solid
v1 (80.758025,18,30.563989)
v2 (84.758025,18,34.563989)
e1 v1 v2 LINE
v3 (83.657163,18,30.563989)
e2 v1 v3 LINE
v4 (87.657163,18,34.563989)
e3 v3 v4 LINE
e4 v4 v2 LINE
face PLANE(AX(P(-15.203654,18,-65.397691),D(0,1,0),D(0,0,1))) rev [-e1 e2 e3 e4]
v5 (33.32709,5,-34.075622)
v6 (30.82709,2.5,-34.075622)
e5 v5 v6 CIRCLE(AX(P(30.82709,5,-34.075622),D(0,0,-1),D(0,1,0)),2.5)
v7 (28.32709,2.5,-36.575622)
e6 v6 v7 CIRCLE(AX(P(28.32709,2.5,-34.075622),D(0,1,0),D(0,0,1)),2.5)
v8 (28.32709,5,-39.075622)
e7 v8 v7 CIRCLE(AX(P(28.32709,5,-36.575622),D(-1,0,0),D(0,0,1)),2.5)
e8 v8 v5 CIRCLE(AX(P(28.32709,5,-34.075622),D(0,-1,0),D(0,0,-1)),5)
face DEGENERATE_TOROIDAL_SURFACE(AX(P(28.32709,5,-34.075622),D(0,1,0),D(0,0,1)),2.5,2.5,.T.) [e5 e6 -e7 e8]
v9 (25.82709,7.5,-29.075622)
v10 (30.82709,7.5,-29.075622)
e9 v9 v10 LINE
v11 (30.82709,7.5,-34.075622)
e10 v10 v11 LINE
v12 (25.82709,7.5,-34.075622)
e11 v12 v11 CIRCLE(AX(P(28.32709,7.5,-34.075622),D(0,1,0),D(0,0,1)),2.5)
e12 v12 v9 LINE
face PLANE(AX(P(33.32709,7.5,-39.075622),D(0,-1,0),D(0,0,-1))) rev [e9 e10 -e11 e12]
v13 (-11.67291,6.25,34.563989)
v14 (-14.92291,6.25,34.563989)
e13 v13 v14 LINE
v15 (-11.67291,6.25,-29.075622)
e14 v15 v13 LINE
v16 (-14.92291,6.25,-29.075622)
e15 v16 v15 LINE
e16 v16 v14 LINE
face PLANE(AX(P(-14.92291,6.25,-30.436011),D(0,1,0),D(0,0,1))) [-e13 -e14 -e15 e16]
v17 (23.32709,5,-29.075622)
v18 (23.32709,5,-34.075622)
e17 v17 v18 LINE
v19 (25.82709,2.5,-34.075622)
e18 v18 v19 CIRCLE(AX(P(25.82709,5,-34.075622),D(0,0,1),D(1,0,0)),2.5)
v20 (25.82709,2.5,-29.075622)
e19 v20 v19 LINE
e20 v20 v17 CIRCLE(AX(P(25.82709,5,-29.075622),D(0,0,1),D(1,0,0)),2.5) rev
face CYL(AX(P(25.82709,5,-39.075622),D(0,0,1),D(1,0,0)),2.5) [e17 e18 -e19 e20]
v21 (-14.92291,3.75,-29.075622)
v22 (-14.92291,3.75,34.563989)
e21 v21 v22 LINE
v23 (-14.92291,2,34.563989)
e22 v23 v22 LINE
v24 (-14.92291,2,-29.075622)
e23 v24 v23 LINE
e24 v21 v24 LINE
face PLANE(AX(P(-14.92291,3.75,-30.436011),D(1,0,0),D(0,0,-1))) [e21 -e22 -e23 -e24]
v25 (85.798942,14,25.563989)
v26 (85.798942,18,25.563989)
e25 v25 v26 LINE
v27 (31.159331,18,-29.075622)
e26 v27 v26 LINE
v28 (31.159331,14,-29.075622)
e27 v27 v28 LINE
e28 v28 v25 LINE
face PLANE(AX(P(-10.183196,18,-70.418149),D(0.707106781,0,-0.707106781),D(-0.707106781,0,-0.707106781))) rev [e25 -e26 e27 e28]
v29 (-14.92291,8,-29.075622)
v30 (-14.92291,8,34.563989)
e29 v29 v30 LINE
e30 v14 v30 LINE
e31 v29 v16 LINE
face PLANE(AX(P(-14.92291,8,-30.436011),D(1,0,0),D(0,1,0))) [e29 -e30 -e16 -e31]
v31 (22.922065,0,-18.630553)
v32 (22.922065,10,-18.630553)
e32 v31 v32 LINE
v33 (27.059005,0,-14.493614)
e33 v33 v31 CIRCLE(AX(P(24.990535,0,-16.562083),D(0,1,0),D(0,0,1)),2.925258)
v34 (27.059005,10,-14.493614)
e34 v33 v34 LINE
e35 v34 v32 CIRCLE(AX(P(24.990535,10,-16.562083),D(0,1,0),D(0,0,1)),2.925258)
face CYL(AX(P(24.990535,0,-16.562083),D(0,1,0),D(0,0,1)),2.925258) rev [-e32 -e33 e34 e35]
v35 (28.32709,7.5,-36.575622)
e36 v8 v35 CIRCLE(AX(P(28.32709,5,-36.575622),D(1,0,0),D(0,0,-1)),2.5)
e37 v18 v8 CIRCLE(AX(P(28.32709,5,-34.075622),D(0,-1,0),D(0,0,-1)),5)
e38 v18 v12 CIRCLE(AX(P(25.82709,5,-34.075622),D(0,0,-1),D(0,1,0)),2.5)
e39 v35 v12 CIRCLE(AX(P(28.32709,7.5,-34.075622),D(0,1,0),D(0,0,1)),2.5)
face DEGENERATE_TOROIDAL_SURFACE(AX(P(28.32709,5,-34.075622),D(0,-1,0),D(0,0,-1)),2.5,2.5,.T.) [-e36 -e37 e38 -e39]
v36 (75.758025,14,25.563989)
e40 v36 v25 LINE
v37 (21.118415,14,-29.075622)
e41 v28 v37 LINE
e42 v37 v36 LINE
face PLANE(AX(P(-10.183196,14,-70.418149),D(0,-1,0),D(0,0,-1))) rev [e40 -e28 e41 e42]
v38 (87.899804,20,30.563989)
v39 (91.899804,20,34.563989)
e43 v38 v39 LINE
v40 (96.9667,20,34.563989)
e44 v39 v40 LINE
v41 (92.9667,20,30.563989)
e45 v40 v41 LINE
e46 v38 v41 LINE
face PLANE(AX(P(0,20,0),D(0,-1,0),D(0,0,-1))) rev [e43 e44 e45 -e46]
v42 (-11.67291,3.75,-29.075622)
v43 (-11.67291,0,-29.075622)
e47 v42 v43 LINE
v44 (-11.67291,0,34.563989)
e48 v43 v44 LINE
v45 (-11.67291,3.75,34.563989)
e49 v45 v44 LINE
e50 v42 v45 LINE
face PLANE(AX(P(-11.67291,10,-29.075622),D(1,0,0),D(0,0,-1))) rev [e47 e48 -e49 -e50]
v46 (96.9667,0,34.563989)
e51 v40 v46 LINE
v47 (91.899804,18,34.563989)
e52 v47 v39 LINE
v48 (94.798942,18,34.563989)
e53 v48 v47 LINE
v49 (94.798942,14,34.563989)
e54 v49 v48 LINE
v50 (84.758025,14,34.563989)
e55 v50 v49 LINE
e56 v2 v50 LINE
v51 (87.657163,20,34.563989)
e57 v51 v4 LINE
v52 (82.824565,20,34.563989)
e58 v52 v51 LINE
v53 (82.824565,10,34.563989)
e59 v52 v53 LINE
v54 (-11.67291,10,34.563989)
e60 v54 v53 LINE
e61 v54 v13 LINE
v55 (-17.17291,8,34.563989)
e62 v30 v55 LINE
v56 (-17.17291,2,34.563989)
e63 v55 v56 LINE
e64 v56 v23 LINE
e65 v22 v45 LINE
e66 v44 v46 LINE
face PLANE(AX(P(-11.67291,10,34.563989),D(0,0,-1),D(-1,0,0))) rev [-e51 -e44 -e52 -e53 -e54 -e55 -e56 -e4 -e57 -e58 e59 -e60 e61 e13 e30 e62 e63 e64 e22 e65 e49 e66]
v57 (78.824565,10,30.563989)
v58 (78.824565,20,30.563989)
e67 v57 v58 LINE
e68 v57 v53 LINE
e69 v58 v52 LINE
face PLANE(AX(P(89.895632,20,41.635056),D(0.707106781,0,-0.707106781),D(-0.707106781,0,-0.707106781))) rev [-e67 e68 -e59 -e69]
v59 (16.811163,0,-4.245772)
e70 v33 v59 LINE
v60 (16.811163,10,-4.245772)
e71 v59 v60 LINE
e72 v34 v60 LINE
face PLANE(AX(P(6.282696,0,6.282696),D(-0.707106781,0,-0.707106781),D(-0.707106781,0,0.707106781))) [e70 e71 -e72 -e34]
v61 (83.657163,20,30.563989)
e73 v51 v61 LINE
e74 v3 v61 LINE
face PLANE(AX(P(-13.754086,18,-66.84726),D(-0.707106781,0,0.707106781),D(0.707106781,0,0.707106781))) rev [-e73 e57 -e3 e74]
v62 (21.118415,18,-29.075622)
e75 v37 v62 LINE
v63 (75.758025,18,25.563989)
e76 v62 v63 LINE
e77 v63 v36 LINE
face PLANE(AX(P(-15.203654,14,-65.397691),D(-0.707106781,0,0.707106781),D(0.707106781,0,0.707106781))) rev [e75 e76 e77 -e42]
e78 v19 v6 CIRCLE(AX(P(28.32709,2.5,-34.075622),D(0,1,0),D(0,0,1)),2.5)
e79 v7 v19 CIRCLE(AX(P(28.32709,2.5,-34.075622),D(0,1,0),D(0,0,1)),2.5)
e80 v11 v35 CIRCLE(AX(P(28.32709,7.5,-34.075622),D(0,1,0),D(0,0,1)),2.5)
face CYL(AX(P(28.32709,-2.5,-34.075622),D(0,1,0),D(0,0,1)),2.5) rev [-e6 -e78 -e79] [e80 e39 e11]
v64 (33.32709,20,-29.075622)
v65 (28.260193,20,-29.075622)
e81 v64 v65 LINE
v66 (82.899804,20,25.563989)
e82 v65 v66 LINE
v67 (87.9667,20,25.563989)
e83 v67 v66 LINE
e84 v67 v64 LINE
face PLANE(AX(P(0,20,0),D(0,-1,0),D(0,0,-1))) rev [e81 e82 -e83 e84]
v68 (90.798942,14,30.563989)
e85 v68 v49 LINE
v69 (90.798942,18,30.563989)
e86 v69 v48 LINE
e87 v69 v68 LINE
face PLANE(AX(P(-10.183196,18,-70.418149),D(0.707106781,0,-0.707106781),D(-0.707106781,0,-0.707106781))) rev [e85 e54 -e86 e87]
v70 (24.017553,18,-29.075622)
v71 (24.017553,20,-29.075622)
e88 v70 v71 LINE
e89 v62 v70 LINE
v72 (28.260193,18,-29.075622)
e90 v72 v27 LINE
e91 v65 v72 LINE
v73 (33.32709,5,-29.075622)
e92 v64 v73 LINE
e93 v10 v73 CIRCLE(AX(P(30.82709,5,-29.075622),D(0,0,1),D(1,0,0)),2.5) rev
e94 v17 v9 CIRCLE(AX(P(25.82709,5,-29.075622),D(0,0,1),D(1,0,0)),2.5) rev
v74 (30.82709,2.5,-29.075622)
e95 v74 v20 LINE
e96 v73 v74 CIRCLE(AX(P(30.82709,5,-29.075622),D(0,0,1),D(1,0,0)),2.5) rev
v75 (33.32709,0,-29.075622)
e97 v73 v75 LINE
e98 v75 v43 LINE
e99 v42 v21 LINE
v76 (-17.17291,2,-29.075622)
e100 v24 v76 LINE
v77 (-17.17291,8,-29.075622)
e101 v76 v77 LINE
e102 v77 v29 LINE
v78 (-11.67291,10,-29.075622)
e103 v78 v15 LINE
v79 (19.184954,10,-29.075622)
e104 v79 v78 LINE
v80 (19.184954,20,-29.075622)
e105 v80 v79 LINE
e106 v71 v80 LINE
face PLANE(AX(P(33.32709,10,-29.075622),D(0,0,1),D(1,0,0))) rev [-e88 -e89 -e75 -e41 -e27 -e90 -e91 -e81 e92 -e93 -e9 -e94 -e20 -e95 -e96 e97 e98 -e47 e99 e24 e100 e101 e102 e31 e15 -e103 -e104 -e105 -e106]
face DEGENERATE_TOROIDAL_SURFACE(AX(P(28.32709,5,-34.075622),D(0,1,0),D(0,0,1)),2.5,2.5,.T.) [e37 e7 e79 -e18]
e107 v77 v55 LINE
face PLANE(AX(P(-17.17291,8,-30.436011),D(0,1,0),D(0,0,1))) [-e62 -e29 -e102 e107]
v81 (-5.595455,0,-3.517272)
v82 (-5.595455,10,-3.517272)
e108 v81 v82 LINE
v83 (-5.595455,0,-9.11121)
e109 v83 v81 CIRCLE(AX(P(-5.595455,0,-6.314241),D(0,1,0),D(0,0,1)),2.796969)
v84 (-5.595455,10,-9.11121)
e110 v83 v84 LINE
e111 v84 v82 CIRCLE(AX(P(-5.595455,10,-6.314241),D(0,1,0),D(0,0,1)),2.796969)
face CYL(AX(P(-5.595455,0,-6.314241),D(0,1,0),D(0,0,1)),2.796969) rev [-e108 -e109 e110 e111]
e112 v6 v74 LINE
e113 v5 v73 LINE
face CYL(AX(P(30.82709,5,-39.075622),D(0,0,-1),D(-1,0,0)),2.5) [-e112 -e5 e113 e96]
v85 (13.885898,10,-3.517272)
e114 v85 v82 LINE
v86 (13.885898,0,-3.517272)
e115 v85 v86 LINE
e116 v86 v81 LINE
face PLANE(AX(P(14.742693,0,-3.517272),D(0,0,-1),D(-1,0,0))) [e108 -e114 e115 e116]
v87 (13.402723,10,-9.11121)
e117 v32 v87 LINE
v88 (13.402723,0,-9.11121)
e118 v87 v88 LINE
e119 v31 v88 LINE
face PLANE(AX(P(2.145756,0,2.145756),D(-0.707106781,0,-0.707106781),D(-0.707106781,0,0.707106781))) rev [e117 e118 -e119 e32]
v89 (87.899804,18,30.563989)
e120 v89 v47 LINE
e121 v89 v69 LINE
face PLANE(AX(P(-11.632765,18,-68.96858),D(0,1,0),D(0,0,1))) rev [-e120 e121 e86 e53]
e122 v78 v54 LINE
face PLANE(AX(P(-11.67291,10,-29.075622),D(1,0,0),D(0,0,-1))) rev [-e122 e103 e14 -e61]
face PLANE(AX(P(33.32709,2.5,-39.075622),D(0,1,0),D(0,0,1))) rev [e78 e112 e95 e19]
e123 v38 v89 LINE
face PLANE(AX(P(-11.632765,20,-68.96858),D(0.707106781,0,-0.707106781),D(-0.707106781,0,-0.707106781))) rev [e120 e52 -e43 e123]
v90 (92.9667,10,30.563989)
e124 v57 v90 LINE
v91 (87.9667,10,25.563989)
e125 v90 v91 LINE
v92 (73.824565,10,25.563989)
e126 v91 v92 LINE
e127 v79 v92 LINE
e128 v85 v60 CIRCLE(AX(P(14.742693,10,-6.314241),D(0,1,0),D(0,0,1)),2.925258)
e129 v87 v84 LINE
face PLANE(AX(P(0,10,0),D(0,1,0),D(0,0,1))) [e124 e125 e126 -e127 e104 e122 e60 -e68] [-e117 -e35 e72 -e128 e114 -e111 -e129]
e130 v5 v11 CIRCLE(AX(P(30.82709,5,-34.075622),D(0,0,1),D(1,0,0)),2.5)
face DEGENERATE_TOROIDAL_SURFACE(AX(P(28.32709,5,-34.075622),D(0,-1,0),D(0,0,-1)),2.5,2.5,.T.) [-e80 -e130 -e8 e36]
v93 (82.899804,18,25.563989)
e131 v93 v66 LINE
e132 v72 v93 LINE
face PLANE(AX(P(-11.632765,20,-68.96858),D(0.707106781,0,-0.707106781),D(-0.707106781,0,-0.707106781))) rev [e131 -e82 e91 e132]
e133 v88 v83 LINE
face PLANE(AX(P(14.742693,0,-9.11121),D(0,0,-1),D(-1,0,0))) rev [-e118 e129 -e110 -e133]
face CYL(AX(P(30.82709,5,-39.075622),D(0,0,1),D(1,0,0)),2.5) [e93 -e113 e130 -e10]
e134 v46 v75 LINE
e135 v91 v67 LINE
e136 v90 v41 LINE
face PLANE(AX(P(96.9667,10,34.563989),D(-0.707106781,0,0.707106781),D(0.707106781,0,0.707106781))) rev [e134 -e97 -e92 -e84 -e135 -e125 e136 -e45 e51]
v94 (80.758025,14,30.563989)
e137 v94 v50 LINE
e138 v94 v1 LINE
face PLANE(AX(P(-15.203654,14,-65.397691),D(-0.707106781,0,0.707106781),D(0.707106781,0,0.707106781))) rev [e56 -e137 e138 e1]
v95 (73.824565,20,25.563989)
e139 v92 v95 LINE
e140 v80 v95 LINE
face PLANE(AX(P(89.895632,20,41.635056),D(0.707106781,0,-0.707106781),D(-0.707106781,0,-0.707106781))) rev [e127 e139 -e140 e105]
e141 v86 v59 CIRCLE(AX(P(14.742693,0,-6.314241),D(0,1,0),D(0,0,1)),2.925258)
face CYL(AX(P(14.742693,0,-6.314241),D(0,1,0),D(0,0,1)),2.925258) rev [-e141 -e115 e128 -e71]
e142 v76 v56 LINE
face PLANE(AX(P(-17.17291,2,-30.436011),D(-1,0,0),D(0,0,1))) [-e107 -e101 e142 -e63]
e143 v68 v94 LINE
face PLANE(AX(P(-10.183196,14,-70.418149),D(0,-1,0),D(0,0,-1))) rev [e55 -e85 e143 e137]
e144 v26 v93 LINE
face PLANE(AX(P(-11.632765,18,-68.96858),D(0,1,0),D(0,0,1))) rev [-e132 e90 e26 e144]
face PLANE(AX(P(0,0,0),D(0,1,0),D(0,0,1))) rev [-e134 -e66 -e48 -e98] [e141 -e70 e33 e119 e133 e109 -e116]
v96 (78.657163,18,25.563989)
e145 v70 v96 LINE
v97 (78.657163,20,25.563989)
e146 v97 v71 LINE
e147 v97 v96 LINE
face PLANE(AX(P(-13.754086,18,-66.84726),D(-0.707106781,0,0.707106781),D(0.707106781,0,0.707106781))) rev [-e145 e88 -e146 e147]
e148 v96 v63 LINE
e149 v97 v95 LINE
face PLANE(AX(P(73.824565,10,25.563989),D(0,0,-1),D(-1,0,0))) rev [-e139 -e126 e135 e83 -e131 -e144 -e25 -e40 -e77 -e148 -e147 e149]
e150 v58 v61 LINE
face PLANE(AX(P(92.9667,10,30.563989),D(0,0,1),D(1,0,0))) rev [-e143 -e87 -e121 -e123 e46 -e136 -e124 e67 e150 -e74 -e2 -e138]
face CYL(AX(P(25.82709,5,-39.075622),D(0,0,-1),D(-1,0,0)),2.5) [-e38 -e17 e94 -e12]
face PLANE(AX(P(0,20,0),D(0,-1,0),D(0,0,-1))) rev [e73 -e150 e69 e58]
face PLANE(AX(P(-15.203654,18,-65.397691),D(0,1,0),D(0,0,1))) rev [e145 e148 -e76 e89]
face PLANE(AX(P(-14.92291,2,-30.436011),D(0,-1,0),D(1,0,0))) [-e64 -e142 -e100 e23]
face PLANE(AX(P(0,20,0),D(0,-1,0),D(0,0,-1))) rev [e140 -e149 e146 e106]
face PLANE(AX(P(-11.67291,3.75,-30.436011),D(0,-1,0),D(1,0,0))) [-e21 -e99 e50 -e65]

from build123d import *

# Parameters (mm, degrees)
BOSS_EXTRUDE1_DEPTH = 10
BOSS_EXTRUDE3_DEPTH = 65
SKETCH3_W           = 6.566984135
SKETCH3_H           = 1.360389693
CUT_EXTRUDE2_DEPTH  = 65
BOSS_EXTRUDE4_DEPTH = 3.25
BOSS_EXTRUDE5_DEPTH = 2.25
SKETCH7_W           = 10
SKETCH7_H           = 5
BOSS_EXTRUDE6_DEPTH = 10
SKETCH8_R           = 2.5
CUT_EXTRUDE3_DEPTH  = 10
FILLET1_R           = 5
FILLET2_R           = 5
FILLET4_R           = 2.5
FILLET5_R           = 2.5
SKETCH9_W           = 100
SKETCH9_H           = 5.5
CUT_EXTRUDE4_DEPTH  = 100
BOSS_EXTRUDE7_DEPTH = 10
CUT_EXTRUDE5_DEPTH  = 150
SKETCH12_W          = 29.92089387
SKETCH12_H          = 33.203721342
CUT_EXTRUDE6_DEPTH  = 150
SKETCH14_W          = 19.184954217
SKETCH14_H          = 28.132637814
CUT_EXTRUDE7_DEPTH  = 150
SKETCH16_W          = 15.620456736
SKETCH16_H          = 10.822807293
CUT_EXTRUDE8_DEPTH  = 150
CUT_EXTRUDE9_DEPTH  = 10
CUT_EXTRUDE10_DEPTH = 10


with BuildPart() as part:
    # Sketch1 → Boss-Extrude1 (new body)
    with BuildSketch(Plane(origin=(0, 0, 0), x_dir=(1, 0, 0), z_dir=(0, 1, 0))):
        Polygon((-11.672910159, -34.563988547), (96.966700148, -34.563988547), (33.327089841, 29.07562176), (-11.672910159, 29.07562176), align=None)
    extrude(amount=BOSS_EXTRUDE1_DEPTH)

    # Sketch2 → Boss-Extrude3 (add)
    with BuildSketch(Plane.XY.offset(34.563988547)):
        Polygon((-11.672910159, 3.75), (-14.922910159, 3.75), (-14.922910159, 2), (-17.172910159, 2), (-17.172910159, 8), (-14.922910159, 8), (-14.922910159, 6.25), (-11.672910159, 6.25), align=None)
    extrude(amount=-BOSS_EXTRUDE3_DEPTH)

    # Sketch3 → Cut-Extrude2 (cut)
    with BuildSketch(Plane(origin=(0, 8, 0), x_dir=(1, 0, 0), z_dir=(0, 1, 0))):
        with Locations((-13.889418092, 29.755816607)):
            Rectangle(SKETCH3_W, SKETCH3_H)
    extrude(amount=-CUT_EXTRUDE2_DEPTH, mode=Mode.SUBTRACT)

    # Sketch4 → Boss-Extrude4 (add)
    with BuildSketch(Plane(origin=(0, 10, 0), x_dir=(1, 0, 0), z_dir=(0, 1, 0))):
        Polygon((91.663399289, -34.563988547), (28.023788982, 29.07562176), (25.520630977, 29.07562176), (89.160241283, -34.563988547), align=None)
    extrude(amount=BOSS_EXTRUDE4_DEPTH)

    # Sketch6 → Boss-Extrude5 (add)
    with BuildSketch(Plane(origin=(0, 13.25, 0), x_dir=(1, 0, 0), z_dir=(0, 1, 0))):
        Polygon((90.411820286, -34.563988547), (94.136820286, -34.563988547), (30.497209979, 29.07562176), (23.047209979, 29.07562176), (86.686820286, -34.563988547), align=None)
    extrude(amount=BOSS_EXTRUDE5_DEPTH)

    # Sketch7 → Boss-Extrude6 (add)
    with BuildSketch(Plane(origin=(0, 0, -29.07562176), x_dir=(-1, 0, 0), z_dir=(0, 0, -1))):
        with Locations((-28.327089841, 5)):
            Rectangle(SKETCH7_W, SKETCH7_H)
    extrude(amount=BOSS_EXTRUDE6_DEPTH)

    # Sketch8 → Cut-Extrude3 (cut)
    with BuildSketch(Plane(origin=(0, 7.5, 0), x_dir=(1, 0, 0), z_dir=(0, 1, 0))):
        with Locations(Location((28.327089841, 34.07562176, 0), (0, 0, 270))):
            Circle(SKETCH8_R)
    extrude(amount=-CUT_EXTRUDE3_DEPTH, mode=Mode.SUBTRACT)

    # Fillet1
    fillet1_edges = [part.edges().sort_by_distance(p)[0] for p in [
        (23.327089841, 5, -39.07562176),
    ]]
    fillet(fillet1_edges, radius=FILLET1_R)

    # Fillet2
    fillet2_edges = [part.edges().sort_by_distance(p)[0] for p in [
        (33.327089841, 5, -39.07562176),
    ]]
    fillet(fillet2_edges, radius=FILLET2_R - 0.0001)  # a hair under: the kernel refuses the full size

    # Fillet4
    fillet4_edges = [part.edges().sort_by_distance(p)[0] for p in [
        (23.327089841, 7.5, -31.57562176),
        (33.327089841, 7.5, -31.57567176),
        (24.791555935, 7.5, -37.611155666),
    ]]
    fillet(fillet4_edges, radius=FILLET4_R - 0.0001)  # a hair under: the kernel refuses the full size

    # Fillet5
    fillet5_edges = [part.edges().sort_by_distance(p)[0] for p in [
        (23.327089841, 2.5, -31.57562176),
        (33.327089841, 2.5, -31.57567176),
        (24.791555935, 2.5, -37.611155666),
        (31.862653036, 2.5, -37.611184955),
    ]]
    fillet(fillet5_edges, radius=FILLET5_R - 0.0001)  # a hair under: the kernel refuses the full size

    # Sketch9 → Cut-Extrude4 (cut)
    with BuildSketch(Plane.XY.offset(34.563988547)):
        with Locations((44.136820286, 12.75)):
            Rectangle(SKETCH9_W, SKETCH9_H)
    extrude(amount=-CUT_EXTRUDE4_DEPTH, mode=Mode.SUBTRACT)

    # Sketch10 → Boss-Extrude7 (add)
    with BuildSketch(Plane(origin=(0, 10, 0), x_dir=(1, 0, 0), z_dir=(0, 1, 0))):
        Polygon((96.966700148, -34.563988547), (89.895632336, -41.635056358), (7.416994707, 40.84358127), (14.488062519, 47.914649082), align=None)
    extrude(amount=BOSS_EXTRUDE7_DEPTH)

    # Sketch11 → Cut-Extrude5 (cut)
    with BuildSketch(Plane(origin=(65.765344347, 0, 65.765344347), x_dir=(0.7071067811865475, 0, -0.7071067811865477), z_dir=(0.7071067811865477, 0, 0.7071067811865475))):
        Polygon((40.542543722, 20), (40.542543722, 18), (42.592543722, 18), (42.592543722, 14), (35.492543722, 14), (35.492543722, 18), (37.542543722, 18), (37.542543722, 20), align=None)
    extrude(amount=-CUT_EXTRUDE5_DEPTH, mode=Mode.SUBTRACT)

    # Sketch12 → Cut-Extrude6 (cut)
    with BuildSketch(Plane(origin=(0, 10, 0), x_dir=(-1, 0, 0), z_dir=(0, -1, 0))):
        with Locations((-34.145401152, 45.677482431)):
            Rectangle(SKETCH12_W, SKETCH12_H)
    extrude(amount=-CUT_EXTRUDE6_DEPTH, mode=Mode.SUBTRACT)


with BuildPart() as cut_extrude6_piece_1:
    # of the separate pieces the step leaves, piece 1, a body of its own (cut_extrude6_pieces)
    add(part.part.solids().sort_by_distance((30.827189841, 2.5, -29.07562176))[0])

    # Sketch16 → Cut-Extrude8 (cut)
    with BuildSketch(Plane(origin=(0, 10, 0), x_dir=(-1, 0, 0), z_dir=(0, -1, 0))):
        with Locations((-90.634792892, -39.975392193)):
            Rectangle(SKETCH16_W, SKETCH16_H)
    extrude(amount=-CUT_EXTRUDE8_DEPTH, mode=Mode.SUBTRACT)

    # Sketch17 → Cut-Extrude9 (cut)
    with BuildSketch(Plane(origin=(0, 20, 0), x_dir=(1, 0, 0), z_dir=(0, 1, 0))):
        Polygon((92.966700148, -30.563988547), (78.824564524, -30.563988547), (73.824564524, -25.563988547), (87.966700148, -25.563988547), align=None)
    extrude(amount=-CUT_EXTRUDE9_DEPTH, mode=Mode.SUBTRACT)

    # Sketch18 → Cut-Extrude10 (cut)
    with BuildSketch(Plane(origin=(0, 10, 0), x_dir=(1, 0, 0), z_dir=(0, 1, 0))):
        with BuildLine():
            Line((27.059004739, 14.493613639), (16.811162643, 4.245771544))
            ThreePointArc((16.811162643, 4.245771544), (12.674223335, 4.245771544), (12.674223335, 8.382710852))
            Line((12.674223335, 8.382710852), (22.92206543, 18.630552948))
            ThreePointArc((22.92206543, 18.630552948), (27.059004739, 18.630552948), (27.059004739, 14.493613639))
        make_face()
        with BuildLine():
            Line((14.742692989, 3.517272066), (-5.595455146, 3.517272066))
            ThreePointArc((-5.595455146, 3.517272066), (-8.392424278, 6.314241198), (-5.595455146, 9.11121033))
            Line((-5.595455146, 9.11121033), (14.742692989, 9.11121033))
            ThreePointArc((14.742692989, 9.11121033), (17.539662121, 6.314241198), (14.742692989, 3.517272066))
        make_face()
    extrude(amount=-CUT_EXTRUDE10_DEPTH, mode=Mode.SUBTRACT)


with BuildPart() as cut_extrude6_piece_2:
    # of the separate pieces the step leaves, piece 2, a body of its own (cut_extrude6_pieces)
    add(part.part.solids().sort_by_distance((7.416994707, 10, -40.84358127))[0])

    # Sketch14 → Cut-Extrude7 (cut)
    with BuildSketch(Plane(origin=(0, 10, 0), x_dir=(-1, 0, 0), z_dir=(0, -1, 0))):
        with Locations((-9.592477109, 43.141940667)):
            Rectangle(SKETCH14_W, SKETCH14_H)
    extrude(amount=-CUT_EXTRUDE7_DEPTH, mode=Mode.SUBTRACT)


solid = cut_extrude6_piece_1.part
